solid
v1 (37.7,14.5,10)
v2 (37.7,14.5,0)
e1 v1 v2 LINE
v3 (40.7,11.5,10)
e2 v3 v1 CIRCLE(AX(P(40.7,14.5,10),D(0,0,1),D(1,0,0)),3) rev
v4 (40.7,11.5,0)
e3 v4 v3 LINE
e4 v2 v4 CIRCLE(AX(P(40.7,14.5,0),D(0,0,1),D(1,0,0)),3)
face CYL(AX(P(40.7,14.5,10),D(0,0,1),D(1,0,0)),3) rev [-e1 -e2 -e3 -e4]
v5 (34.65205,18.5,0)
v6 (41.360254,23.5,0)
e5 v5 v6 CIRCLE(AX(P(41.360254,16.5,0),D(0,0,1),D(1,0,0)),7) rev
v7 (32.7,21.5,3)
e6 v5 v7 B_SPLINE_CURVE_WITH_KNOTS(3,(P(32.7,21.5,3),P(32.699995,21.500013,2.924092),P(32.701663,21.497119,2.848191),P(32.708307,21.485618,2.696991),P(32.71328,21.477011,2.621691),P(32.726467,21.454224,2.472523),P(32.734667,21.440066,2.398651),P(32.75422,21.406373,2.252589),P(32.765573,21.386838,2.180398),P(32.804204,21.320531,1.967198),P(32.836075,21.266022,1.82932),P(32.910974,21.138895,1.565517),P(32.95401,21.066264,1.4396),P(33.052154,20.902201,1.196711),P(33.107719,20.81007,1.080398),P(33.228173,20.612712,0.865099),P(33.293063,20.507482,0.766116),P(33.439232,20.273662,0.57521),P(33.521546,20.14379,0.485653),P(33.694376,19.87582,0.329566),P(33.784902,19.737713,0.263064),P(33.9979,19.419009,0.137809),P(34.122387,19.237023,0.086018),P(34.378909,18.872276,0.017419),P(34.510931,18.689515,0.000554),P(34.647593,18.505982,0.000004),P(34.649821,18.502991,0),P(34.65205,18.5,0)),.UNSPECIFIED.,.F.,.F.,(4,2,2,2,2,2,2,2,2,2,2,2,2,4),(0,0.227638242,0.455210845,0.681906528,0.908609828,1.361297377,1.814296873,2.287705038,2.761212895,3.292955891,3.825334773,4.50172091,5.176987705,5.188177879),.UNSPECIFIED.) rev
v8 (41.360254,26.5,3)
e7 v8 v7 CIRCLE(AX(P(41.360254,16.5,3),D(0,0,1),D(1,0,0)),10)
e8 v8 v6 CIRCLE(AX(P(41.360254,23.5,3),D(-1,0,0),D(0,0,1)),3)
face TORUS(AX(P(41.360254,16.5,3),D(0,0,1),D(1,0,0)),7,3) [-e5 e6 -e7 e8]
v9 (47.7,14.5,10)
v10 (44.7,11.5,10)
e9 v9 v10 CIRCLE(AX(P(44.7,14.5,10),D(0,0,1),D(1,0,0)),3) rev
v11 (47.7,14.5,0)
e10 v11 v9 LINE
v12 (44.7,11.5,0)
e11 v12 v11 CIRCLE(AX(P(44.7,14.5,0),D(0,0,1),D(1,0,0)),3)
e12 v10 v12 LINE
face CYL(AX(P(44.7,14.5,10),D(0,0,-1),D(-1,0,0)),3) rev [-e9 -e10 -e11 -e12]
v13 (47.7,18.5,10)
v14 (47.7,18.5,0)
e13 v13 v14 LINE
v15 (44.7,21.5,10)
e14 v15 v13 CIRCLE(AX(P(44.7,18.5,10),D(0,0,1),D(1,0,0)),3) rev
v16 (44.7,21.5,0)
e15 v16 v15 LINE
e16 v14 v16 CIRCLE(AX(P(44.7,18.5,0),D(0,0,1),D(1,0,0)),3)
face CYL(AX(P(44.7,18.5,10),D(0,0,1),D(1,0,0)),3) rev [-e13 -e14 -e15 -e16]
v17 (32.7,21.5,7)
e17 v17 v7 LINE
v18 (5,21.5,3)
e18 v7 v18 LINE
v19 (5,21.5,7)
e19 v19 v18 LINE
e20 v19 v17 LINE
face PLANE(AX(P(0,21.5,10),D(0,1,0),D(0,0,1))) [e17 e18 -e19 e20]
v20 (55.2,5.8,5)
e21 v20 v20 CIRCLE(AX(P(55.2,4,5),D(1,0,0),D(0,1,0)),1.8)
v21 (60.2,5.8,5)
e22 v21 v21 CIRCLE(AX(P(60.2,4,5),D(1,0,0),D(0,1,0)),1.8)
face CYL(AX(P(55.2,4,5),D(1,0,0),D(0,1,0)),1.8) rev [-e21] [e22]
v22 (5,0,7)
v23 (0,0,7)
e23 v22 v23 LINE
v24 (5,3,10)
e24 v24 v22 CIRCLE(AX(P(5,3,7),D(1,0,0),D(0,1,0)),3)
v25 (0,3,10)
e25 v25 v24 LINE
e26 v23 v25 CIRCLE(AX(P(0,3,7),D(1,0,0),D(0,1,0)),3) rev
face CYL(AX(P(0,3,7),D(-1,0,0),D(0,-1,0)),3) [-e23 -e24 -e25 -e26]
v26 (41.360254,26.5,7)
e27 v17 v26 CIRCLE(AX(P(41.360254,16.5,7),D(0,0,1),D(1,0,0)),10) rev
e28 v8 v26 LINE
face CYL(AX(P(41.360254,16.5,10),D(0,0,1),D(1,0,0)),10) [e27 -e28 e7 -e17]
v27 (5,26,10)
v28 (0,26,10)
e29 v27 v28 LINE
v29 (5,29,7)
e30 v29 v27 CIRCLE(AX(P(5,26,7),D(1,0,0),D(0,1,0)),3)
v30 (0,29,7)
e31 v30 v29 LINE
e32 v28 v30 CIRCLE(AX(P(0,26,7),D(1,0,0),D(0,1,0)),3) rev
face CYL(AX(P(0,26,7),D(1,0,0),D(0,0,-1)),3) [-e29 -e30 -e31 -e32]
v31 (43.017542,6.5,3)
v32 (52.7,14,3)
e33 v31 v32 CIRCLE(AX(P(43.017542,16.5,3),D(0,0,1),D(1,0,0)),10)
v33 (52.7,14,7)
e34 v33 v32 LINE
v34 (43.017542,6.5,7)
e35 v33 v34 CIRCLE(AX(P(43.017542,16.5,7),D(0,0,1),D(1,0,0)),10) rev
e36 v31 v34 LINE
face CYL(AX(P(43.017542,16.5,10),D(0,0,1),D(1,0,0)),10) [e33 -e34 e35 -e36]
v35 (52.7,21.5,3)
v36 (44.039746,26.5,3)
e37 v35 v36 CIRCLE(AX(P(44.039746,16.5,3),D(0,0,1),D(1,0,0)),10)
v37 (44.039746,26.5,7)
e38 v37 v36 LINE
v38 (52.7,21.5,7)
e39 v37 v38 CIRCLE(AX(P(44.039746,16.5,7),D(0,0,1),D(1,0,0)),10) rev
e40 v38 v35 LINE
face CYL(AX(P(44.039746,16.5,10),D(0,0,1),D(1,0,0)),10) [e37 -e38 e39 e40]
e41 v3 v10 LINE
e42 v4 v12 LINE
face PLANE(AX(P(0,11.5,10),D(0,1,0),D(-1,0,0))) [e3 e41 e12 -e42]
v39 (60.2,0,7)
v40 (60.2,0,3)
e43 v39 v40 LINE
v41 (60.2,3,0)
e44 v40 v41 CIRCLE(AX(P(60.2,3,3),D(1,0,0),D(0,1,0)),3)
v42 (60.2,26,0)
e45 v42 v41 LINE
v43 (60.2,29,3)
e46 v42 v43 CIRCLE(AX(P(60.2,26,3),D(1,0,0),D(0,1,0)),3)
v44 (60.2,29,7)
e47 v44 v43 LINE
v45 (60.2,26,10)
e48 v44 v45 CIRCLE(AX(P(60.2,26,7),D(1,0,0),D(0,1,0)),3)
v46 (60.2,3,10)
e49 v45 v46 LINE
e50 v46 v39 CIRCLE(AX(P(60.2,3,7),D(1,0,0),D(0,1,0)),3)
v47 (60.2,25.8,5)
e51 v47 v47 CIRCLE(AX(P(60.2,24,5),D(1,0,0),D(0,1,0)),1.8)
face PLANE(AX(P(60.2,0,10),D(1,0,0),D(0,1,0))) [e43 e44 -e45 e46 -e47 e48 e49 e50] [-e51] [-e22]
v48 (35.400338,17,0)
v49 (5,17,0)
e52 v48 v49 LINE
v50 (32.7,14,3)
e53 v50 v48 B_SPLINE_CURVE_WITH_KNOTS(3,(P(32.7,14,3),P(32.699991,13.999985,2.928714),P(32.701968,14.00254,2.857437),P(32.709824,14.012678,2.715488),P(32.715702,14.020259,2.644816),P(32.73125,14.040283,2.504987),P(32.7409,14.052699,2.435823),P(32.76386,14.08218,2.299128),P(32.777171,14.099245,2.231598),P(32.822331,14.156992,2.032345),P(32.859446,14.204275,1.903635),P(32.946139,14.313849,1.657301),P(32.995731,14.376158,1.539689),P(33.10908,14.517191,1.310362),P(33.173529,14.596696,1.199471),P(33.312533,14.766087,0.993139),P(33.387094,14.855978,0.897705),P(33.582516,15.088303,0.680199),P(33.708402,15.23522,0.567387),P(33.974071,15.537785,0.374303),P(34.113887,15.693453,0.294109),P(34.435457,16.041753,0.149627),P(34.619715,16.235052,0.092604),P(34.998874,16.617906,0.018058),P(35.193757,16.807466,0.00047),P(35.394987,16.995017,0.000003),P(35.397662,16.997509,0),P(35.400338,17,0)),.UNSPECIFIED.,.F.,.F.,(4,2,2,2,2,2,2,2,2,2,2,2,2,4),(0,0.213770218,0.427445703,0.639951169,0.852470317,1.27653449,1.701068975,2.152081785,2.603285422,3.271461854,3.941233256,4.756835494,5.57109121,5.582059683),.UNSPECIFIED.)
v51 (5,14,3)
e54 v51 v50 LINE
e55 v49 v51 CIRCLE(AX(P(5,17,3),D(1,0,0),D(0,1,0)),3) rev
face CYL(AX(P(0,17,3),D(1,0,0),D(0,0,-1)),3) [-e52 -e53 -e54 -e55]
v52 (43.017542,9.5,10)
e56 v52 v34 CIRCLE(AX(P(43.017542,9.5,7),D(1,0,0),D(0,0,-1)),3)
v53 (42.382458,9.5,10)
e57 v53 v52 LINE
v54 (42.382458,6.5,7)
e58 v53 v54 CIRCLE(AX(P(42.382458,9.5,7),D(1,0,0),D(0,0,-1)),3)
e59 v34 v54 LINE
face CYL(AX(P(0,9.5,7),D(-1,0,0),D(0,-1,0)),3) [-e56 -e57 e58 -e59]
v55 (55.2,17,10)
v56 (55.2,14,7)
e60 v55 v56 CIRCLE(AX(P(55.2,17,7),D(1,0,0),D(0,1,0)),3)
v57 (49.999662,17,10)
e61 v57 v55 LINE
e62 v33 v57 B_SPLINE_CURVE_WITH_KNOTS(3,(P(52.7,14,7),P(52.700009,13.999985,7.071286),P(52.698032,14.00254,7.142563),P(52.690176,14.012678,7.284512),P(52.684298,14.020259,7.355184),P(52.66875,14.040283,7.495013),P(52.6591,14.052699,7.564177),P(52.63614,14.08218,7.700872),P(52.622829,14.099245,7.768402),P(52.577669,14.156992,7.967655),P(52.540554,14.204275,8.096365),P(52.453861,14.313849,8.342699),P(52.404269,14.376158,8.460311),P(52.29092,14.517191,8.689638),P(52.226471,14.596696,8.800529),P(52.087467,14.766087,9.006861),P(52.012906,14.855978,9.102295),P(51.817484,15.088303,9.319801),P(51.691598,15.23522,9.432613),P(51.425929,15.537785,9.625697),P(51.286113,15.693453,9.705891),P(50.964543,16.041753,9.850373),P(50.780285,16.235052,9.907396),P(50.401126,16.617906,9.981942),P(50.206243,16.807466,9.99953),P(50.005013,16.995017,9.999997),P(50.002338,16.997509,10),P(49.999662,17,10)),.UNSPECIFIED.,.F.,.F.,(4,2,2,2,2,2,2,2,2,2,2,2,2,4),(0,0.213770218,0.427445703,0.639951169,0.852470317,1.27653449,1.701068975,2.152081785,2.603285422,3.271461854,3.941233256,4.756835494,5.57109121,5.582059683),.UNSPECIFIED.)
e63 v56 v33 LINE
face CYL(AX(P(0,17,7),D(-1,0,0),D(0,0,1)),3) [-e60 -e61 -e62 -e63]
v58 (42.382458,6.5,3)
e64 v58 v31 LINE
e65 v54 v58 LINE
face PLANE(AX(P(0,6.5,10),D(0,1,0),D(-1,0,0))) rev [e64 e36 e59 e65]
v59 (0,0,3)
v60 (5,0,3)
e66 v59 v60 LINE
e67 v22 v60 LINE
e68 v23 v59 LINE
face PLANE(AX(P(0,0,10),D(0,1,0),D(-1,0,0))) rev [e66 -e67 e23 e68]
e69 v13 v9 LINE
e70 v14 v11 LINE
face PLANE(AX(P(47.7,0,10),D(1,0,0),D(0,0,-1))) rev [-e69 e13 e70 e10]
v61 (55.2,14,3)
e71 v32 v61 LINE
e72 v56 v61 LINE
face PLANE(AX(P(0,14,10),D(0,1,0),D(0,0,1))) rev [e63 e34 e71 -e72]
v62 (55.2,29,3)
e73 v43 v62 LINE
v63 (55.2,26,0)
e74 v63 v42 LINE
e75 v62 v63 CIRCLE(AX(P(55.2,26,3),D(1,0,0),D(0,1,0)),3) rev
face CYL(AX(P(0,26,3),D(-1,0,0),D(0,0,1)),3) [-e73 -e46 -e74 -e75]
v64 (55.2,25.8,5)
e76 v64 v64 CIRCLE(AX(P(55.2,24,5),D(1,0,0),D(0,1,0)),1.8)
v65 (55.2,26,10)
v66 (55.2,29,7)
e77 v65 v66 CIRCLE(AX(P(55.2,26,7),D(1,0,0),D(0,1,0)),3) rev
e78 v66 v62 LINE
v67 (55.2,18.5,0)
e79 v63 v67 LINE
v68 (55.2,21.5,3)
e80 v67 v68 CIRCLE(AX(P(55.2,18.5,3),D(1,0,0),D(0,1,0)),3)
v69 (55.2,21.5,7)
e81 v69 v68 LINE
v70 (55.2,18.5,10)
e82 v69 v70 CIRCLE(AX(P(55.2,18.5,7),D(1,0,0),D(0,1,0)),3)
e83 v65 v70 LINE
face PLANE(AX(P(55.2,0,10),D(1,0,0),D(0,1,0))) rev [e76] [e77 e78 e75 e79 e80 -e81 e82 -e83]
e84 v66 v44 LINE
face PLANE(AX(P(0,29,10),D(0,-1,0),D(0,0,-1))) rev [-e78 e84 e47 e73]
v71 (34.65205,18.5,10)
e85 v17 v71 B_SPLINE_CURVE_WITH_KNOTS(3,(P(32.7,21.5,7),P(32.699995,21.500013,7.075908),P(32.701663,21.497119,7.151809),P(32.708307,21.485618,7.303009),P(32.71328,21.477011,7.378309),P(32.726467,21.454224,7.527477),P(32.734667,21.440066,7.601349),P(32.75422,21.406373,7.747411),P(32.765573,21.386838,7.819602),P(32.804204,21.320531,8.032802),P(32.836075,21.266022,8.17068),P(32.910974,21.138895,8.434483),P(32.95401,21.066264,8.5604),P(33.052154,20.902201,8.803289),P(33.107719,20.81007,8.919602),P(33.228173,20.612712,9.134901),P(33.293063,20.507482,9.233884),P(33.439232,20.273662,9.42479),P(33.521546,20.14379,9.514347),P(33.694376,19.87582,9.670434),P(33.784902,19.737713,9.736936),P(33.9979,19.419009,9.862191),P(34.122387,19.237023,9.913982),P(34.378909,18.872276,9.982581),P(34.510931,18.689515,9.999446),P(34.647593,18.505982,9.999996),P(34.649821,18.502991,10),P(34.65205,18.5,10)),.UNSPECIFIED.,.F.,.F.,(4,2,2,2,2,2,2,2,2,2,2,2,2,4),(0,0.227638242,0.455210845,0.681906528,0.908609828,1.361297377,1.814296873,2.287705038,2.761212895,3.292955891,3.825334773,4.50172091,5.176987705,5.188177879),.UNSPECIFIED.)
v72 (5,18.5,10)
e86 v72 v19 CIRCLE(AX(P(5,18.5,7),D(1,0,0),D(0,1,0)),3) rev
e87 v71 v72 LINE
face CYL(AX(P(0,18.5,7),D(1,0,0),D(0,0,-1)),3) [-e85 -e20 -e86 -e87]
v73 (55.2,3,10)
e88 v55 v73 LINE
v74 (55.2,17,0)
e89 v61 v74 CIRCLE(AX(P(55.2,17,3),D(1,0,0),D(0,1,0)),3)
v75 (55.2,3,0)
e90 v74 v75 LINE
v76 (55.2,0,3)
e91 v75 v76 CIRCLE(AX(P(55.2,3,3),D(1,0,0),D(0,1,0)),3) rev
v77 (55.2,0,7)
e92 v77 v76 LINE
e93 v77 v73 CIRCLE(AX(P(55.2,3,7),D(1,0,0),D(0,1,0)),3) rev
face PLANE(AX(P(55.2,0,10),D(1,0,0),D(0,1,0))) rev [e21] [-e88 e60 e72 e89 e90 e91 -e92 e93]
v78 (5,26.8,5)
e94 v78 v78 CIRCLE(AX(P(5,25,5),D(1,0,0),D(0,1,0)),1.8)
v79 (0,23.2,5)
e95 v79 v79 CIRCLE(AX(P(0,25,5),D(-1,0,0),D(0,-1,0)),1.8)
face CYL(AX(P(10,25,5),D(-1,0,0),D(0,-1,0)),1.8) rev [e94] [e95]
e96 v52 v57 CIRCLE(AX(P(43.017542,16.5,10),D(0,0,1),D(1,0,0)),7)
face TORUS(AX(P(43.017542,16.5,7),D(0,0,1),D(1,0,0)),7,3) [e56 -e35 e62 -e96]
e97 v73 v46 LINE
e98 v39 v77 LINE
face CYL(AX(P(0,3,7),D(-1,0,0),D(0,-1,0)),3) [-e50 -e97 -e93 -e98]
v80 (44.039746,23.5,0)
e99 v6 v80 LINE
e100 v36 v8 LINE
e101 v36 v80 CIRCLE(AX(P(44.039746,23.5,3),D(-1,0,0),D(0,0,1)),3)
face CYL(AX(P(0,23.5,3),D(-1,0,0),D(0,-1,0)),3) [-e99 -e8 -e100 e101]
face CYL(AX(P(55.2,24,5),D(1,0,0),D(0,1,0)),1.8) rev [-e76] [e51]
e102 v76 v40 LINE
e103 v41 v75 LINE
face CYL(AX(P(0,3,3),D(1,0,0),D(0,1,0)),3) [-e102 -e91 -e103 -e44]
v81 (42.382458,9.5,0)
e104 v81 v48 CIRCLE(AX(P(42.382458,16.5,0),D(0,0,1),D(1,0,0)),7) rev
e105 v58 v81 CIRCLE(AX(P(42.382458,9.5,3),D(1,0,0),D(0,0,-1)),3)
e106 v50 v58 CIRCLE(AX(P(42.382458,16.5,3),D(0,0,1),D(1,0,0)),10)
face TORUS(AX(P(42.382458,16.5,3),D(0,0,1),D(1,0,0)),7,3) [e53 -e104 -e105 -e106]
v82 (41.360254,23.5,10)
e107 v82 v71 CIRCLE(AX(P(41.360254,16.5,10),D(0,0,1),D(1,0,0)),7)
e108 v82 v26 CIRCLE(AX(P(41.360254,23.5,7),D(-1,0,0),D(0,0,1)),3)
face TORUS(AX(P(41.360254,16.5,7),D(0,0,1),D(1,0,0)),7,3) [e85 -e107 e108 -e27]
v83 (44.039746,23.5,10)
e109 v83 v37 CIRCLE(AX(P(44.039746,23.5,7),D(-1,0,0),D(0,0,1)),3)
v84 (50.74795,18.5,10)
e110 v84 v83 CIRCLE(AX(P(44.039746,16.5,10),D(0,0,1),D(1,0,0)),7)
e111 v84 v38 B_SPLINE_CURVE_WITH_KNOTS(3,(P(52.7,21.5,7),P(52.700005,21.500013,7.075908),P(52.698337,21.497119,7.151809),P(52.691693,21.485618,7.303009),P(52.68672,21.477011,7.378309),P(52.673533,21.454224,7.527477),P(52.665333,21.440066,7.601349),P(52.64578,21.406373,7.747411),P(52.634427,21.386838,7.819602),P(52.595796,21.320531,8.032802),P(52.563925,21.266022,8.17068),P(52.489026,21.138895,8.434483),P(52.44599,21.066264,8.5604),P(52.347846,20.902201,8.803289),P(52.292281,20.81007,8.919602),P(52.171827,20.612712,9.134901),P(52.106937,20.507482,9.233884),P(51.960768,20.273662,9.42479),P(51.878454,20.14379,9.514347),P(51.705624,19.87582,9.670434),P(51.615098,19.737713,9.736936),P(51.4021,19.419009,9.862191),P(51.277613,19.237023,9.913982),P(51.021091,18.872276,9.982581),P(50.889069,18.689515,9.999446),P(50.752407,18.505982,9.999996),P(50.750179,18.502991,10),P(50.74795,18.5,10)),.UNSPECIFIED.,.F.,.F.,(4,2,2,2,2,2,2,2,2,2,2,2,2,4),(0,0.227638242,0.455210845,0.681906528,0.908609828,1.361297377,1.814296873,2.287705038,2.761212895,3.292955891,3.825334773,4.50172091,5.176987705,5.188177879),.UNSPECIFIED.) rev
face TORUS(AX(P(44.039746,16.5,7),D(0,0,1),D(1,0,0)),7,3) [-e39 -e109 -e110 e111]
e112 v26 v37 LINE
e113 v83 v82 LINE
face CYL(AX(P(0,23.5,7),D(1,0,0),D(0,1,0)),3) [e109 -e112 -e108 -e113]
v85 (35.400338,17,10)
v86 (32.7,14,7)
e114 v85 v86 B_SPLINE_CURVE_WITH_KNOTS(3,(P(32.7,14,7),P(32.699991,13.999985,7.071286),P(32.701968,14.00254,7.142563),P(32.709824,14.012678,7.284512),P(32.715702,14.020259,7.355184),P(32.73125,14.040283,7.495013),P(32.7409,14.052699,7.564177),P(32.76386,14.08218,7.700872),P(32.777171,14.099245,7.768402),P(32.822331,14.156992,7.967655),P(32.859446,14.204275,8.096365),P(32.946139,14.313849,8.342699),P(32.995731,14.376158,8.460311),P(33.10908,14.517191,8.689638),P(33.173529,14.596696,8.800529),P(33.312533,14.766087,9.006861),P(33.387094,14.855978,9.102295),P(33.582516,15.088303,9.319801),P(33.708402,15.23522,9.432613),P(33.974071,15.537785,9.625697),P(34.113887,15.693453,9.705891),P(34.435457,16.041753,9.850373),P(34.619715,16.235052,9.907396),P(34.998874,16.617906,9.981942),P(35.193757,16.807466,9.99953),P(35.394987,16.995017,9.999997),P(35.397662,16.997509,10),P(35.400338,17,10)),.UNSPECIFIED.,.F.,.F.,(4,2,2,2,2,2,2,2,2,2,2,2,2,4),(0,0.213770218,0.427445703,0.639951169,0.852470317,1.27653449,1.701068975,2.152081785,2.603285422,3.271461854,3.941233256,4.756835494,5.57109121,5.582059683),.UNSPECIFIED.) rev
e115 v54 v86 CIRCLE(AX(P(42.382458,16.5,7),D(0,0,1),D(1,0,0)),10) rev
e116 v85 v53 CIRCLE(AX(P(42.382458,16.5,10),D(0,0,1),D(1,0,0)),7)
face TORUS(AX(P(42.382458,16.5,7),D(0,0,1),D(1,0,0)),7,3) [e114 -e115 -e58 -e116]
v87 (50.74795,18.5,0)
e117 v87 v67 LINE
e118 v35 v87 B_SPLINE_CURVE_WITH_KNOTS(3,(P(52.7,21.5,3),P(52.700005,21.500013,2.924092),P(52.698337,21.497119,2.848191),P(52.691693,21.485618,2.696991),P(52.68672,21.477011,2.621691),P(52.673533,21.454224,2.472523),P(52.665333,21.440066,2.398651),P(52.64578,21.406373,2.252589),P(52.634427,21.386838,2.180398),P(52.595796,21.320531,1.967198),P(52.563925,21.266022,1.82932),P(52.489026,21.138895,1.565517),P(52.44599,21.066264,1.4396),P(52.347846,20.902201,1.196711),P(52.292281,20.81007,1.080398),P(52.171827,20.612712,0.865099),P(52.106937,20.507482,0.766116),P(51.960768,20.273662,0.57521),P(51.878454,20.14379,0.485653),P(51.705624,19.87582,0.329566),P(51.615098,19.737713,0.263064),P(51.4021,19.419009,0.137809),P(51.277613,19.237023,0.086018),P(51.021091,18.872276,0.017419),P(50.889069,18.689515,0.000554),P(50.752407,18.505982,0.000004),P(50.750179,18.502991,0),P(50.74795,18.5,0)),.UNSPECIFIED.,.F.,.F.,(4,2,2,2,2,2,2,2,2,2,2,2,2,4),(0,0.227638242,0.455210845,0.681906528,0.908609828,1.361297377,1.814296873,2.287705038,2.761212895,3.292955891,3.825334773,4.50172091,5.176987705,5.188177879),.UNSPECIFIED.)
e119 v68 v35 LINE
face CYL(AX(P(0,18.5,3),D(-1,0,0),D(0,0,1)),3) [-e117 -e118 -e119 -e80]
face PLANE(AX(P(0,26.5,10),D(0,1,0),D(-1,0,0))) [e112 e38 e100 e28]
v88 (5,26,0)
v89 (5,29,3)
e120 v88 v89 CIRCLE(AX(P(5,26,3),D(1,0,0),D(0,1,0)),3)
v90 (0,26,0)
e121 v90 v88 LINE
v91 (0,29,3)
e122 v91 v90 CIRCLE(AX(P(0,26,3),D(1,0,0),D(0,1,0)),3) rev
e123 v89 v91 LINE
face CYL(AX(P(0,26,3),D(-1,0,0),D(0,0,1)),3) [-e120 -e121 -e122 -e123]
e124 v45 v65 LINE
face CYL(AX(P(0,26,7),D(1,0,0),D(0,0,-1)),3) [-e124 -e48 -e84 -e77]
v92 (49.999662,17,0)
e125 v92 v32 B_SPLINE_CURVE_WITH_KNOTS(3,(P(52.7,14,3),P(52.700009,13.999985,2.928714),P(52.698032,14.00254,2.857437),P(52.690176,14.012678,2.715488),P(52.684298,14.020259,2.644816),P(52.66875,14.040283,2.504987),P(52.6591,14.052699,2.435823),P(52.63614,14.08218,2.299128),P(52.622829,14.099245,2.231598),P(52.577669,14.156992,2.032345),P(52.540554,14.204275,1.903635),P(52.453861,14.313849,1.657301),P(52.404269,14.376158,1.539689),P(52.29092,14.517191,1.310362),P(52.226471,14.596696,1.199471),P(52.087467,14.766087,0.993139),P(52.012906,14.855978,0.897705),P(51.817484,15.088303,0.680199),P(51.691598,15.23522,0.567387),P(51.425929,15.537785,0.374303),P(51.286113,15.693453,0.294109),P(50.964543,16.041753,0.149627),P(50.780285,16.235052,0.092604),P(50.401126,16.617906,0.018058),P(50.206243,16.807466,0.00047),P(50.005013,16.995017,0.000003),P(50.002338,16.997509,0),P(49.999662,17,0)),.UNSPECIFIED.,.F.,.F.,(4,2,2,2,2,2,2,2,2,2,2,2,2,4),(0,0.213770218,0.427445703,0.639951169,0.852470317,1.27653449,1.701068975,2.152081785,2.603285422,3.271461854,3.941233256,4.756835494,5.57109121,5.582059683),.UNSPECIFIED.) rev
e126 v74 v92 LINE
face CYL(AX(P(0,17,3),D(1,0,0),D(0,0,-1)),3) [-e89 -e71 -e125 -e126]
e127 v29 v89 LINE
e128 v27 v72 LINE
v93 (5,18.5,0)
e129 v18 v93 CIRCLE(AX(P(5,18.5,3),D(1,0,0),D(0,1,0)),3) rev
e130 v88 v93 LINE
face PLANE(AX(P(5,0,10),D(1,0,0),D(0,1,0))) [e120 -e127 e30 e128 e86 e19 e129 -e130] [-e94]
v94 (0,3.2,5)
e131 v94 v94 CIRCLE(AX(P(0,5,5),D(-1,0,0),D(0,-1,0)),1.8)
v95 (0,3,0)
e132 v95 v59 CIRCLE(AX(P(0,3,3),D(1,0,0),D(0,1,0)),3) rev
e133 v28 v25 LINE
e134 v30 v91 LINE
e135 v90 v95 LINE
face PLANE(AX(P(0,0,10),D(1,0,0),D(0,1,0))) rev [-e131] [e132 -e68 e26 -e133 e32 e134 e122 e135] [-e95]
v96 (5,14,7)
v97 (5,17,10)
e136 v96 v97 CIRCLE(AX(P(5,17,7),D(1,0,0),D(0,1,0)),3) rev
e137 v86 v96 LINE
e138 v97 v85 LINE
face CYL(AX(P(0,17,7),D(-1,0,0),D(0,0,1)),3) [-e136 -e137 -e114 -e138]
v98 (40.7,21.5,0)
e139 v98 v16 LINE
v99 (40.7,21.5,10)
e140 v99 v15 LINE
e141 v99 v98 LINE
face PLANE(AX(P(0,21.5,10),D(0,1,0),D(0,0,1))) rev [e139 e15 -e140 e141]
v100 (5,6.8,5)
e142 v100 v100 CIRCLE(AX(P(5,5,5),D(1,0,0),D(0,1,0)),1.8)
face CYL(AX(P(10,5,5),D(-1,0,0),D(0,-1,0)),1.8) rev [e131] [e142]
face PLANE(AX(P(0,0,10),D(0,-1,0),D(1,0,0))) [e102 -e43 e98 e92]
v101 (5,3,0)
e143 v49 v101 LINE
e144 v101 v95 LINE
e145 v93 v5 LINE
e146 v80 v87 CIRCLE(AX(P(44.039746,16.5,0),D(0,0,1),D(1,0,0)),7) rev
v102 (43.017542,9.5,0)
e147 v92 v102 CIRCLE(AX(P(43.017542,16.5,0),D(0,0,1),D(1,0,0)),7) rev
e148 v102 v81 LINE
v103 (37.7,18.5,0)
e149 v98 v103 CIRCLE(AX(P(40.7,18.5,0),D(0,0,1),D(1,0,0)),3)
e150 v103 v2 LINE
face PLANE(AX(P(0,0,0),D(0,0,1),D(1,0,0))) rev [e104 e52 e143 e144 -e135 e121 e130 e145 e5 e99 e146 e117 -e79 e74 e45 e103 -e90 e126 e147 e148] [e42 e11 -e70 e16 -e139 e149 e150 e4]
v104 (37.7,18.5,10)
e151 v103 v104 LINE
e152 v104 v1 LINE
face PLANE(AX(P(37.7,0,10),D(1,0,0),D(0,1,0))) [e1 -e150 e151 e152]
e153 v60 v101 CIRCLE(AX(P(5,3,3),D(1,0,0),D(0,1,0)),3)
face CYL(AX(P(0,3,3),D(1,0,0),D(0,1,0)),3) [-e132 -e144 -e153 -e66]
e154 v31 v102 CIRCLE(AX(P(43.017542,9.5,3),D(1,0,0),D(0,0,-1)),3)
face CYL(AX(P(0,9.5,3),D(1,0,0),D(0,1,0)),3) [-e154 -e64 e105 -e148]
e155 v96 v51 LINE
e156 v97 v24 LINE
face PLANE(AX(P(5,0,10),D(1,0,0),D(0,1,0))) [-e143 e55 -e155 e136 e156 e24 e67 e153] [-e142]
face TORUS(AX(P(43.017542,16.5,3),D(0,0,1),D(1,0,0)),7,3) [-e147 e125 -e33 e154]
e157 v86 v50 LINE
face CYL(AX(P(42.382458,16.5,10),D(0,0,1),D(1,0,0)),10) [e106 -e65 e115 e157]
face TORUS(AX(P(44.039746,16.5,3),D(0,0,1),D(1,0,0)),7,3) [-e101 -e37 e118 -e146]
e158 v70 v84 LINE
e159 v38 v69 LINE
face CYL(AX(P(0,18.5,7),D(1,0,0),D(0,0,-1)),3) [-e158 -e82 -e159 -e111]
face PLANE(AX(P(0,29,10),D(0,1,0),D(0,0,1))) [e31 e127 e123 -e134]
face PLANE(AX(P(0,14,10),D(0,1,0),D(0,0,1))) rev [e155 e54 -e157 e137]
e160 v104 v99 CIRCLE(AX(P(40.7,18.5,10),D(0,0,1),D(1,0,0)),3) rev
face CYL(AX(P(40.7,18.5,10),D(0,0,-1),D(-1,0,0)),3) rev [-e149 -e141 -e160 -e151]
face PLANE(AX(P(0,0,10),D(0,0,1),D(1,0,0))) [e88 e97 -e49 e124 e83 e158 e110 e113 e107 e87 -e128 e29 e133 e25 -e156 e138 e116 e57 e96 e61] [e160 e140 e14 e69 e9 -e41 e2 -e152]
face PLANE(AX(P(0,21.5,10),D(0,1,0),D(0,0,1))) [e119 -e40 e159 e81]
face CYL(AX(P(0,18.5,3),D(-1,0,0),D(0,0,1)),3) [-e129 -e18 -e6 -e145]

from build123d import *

# Parameters (mm, degrees)
ESQUISSE1_W             = 10
ESQUISSE1_H             = 10
BOSS_EXTRU_1_DEPTH      = 10
CONG_1_R                = 10
CONG_2_R                = 3
ESQUISSE2_R             = 1.8
ENL_V_MAT_EXTRU_1_DEPTH = 5
ESQUISSE3_R             = 1.8
ENL_V_MAT_EXTRU_2_DEPTH = 10
CONG_3_R                = 3


with BuildPart() as part:
    # Esquisse1 → Boss.-Extru.1 (new body)
    with BuildSketch(Plane.XY):
        Polygon((5, 29), (0, 29), (0, 0), (5, 0), (5, 14), (32.7, 14), (32.7, 6.5), (52.7, 6.5), (52.7, 14), (55.2, 14), (55.2, 0), (60.2, 0), (60.2, 29), (55.2, 29), (55.2, 21.5), (52.7, 21.5), (52.7, 26.5), (32.7, 26.5), (32.7, 21.5), (5, 21.5), align=None)
        with Locations((42.7, 16.5)):
            Rectangle(ESQUISSE1_W, ESQUISSE1_H, mode=Mode.SUBTRACT)
    extrude(amount=BOSS_EXTRU_1_DEPTH)

    # Congé1
    # the kernel refuses this fillet: 10 mm, written as the material it takes off along each edge
    with BuildSketch(Plane(origin=(52.7, 6.5, -24.206145914), x_dir=(-1, 0, 0), z_dir=(0, 0, 1))) as cong_1_piece_1:
        with BuildLine():
            CenterArc((9.682458366, -10), CONG_1_R, 90, 75.522487814)
            Line((0, -7.5), (-0.193649167, -7.45))
            ThreePointArc((-0.193649167, -7.45), (-0.2, -3.75), (-0.2, 0))
            Line((-0.2, 0), (0, 0.2))
            Line((0, 0.2), (9.682458366, 0.2))
            Line((9.682458366, 0.2), (9.682458366, 0))
        make_face()
    extrude(amount=58.412291828, mode=Mode.SUBTRACT)
    with BuildSketch(Plane(origin=(32.7, 6.5, -24.206145914), x_dir=(0, 1, 0), z_dir=(0, 0, 1))) as cong_1_piece_2:
        with BuildLine():
            CenterArc((10, -9.682458366), CONG_1_R, 104.477512186, 75.522487814)
            Line((0, -9.682458366), (-0.2, -9.682458366))
            Line((-0.2, -9.682458366), (-0.2, 0))
            Line((-0.2, 0), (0, 0.2))
            ThreePointArc((0, 0.2), (3.75, 0.2), (7.45, 0.193649167))
            Line((7.45, 0.193649167), (7.5, 0))
        make_face()
    extrude(amount=58.412291828, mode=Mode.SUBTRACT)
    with BuildSketch(Plane(origin=(52.7, 26.5, -21.650635095), x_dir=(0, -1, 0), z_dir=(0, 0, 1))) as cong_1_piece_3:
        with BuildLine():
            CenterArc((10, -8.660254038), CONG_1_R, 120, 60)
            Line((0, -8.660254038), (-0.2, -8.660254038))
            Line((-0.2, -8.660254038), (-0.2, 0))
            Line((-0.2, 0), (0, 0.2))
            ThreePointArc((0, 0.2), (2.5, 0.2), (4.9, 0.173205081))
            Line((4.9, 0.173205081), (5, 0))
        make_face()
    extrude(amount=53.301270189, mode=Mode.SUBTRACT)
    with BuildSketch(Plane(origin=(32.7, 26.5, -21.650635095), x_dir=(1, 0, 0), z_dir=(0, 0, 1))) as cong_1_piece_4:
        with BuildLine():
            CenterArc((8.660254038, -10), CONG_1_R, 90, 60)
            Line((0, -5), (-0.173205081, -4.9))
            ThreePointArc((-0.173205081, -4.9), (-0.2, -2.5), (-0.2, 0))
            Line((-0.2, 0), (0, 0.2))
            Line((0, 0.2), (8.660254038, 0.2))
            Line((8.660254038, 0.2), (8.660254038, 0))
        make_face()
    extrude(amount=53.301270189, mode=Mode.SUBTRACT)

    # Congé2
    cong_2_edges = [part.edges().sort_by_distance(p)[0] for p in [
        (47.7, 21.5, 5),
        (37.7, 21.5, 5),
        (37.7, 11.5, 5),
        (47.7, 11.5, 5),
    ]]
    fillet(cong_2_edges, radius=CONG_2_R)

    # Esquisse2 → Enlèv. mat.-Extru.1 (cut)
    with BuildSketch(Plane(origin=(60.2, 0, 0), x_dir=(0, 0, -1), z_dir=(1, 0, 0))):
        with Locations(Location((-5, 24, 0), (0, 0, 90))):
            Circle(ESQUISSE2_R)
        with Locations(Location((-5, 4, 0), (0, 0, 90))):
            Circle(ESQUISSE2_R)
    extrude(amount=-ENL_V_MAT_EXTRU_1_DEPTH, mode=Mode.SUBTRACT)

    # Esquisse3 → Enlèv. mat.-Extru.2 (cut)
    with BuildSketch(Plane.ZY):
        with Locations(Location((5, 25, 0), (0, 0, 270))):
            Circle(ESQUISSE3_R)
        with Locations(Location((5, 5, 0), (0, 0, 270))):
            Circle(ESQUISSE3_R)
    extrude(amount=-ENL_V_MAT_EXTRU_2_DEPTH, mode=Mode.SUBTRACT)

    # Congé3
    cong_3_edges = [part.edges().sort_by_distance(p)[0] for p in [
        (53.95, 14, 10),
        (57.7, 0, 10),
        (18.85, 14, 0),
        (2.5, 0, 0),
        (2.5, 29, 0),
        (57.7, 29, 10),
        (18.85, 21.5, 0),
        (53.95, 21.5, 0),
        (57.7, 29, 0),
        (57.7, 0, 0),
        (53.95, 14, 0),
        (53.95, 21.5, 10),
        (18.85, 21.5, 10),
        (2.5, 29, 10),
        (42.7, 6.5, 0),
        (42.7, 26.5, 0),
        (36.360254038, 25.160254038, 0),
        (49.039745962, 25.160254038, 0),
        (2.5, 0, 10),
        (36.258734009, 8.59430585, 0),
        (49.141265991, 8.59430585, 0),
        (42.7, 6.5, 10),
        (42.7, 26.5, 10),
        (36.360254038, 25.160254038, 10),
        (49.039745962, 25.160254038, 10),
        (36.258734009, 8.59430585, 10),
        (18.85, 14, 10),
        (49.141265991, 8.59430585, 10),
    ]]
    fillet(cong_3_edges, radius=CONG_3_R)


solid = part.part
